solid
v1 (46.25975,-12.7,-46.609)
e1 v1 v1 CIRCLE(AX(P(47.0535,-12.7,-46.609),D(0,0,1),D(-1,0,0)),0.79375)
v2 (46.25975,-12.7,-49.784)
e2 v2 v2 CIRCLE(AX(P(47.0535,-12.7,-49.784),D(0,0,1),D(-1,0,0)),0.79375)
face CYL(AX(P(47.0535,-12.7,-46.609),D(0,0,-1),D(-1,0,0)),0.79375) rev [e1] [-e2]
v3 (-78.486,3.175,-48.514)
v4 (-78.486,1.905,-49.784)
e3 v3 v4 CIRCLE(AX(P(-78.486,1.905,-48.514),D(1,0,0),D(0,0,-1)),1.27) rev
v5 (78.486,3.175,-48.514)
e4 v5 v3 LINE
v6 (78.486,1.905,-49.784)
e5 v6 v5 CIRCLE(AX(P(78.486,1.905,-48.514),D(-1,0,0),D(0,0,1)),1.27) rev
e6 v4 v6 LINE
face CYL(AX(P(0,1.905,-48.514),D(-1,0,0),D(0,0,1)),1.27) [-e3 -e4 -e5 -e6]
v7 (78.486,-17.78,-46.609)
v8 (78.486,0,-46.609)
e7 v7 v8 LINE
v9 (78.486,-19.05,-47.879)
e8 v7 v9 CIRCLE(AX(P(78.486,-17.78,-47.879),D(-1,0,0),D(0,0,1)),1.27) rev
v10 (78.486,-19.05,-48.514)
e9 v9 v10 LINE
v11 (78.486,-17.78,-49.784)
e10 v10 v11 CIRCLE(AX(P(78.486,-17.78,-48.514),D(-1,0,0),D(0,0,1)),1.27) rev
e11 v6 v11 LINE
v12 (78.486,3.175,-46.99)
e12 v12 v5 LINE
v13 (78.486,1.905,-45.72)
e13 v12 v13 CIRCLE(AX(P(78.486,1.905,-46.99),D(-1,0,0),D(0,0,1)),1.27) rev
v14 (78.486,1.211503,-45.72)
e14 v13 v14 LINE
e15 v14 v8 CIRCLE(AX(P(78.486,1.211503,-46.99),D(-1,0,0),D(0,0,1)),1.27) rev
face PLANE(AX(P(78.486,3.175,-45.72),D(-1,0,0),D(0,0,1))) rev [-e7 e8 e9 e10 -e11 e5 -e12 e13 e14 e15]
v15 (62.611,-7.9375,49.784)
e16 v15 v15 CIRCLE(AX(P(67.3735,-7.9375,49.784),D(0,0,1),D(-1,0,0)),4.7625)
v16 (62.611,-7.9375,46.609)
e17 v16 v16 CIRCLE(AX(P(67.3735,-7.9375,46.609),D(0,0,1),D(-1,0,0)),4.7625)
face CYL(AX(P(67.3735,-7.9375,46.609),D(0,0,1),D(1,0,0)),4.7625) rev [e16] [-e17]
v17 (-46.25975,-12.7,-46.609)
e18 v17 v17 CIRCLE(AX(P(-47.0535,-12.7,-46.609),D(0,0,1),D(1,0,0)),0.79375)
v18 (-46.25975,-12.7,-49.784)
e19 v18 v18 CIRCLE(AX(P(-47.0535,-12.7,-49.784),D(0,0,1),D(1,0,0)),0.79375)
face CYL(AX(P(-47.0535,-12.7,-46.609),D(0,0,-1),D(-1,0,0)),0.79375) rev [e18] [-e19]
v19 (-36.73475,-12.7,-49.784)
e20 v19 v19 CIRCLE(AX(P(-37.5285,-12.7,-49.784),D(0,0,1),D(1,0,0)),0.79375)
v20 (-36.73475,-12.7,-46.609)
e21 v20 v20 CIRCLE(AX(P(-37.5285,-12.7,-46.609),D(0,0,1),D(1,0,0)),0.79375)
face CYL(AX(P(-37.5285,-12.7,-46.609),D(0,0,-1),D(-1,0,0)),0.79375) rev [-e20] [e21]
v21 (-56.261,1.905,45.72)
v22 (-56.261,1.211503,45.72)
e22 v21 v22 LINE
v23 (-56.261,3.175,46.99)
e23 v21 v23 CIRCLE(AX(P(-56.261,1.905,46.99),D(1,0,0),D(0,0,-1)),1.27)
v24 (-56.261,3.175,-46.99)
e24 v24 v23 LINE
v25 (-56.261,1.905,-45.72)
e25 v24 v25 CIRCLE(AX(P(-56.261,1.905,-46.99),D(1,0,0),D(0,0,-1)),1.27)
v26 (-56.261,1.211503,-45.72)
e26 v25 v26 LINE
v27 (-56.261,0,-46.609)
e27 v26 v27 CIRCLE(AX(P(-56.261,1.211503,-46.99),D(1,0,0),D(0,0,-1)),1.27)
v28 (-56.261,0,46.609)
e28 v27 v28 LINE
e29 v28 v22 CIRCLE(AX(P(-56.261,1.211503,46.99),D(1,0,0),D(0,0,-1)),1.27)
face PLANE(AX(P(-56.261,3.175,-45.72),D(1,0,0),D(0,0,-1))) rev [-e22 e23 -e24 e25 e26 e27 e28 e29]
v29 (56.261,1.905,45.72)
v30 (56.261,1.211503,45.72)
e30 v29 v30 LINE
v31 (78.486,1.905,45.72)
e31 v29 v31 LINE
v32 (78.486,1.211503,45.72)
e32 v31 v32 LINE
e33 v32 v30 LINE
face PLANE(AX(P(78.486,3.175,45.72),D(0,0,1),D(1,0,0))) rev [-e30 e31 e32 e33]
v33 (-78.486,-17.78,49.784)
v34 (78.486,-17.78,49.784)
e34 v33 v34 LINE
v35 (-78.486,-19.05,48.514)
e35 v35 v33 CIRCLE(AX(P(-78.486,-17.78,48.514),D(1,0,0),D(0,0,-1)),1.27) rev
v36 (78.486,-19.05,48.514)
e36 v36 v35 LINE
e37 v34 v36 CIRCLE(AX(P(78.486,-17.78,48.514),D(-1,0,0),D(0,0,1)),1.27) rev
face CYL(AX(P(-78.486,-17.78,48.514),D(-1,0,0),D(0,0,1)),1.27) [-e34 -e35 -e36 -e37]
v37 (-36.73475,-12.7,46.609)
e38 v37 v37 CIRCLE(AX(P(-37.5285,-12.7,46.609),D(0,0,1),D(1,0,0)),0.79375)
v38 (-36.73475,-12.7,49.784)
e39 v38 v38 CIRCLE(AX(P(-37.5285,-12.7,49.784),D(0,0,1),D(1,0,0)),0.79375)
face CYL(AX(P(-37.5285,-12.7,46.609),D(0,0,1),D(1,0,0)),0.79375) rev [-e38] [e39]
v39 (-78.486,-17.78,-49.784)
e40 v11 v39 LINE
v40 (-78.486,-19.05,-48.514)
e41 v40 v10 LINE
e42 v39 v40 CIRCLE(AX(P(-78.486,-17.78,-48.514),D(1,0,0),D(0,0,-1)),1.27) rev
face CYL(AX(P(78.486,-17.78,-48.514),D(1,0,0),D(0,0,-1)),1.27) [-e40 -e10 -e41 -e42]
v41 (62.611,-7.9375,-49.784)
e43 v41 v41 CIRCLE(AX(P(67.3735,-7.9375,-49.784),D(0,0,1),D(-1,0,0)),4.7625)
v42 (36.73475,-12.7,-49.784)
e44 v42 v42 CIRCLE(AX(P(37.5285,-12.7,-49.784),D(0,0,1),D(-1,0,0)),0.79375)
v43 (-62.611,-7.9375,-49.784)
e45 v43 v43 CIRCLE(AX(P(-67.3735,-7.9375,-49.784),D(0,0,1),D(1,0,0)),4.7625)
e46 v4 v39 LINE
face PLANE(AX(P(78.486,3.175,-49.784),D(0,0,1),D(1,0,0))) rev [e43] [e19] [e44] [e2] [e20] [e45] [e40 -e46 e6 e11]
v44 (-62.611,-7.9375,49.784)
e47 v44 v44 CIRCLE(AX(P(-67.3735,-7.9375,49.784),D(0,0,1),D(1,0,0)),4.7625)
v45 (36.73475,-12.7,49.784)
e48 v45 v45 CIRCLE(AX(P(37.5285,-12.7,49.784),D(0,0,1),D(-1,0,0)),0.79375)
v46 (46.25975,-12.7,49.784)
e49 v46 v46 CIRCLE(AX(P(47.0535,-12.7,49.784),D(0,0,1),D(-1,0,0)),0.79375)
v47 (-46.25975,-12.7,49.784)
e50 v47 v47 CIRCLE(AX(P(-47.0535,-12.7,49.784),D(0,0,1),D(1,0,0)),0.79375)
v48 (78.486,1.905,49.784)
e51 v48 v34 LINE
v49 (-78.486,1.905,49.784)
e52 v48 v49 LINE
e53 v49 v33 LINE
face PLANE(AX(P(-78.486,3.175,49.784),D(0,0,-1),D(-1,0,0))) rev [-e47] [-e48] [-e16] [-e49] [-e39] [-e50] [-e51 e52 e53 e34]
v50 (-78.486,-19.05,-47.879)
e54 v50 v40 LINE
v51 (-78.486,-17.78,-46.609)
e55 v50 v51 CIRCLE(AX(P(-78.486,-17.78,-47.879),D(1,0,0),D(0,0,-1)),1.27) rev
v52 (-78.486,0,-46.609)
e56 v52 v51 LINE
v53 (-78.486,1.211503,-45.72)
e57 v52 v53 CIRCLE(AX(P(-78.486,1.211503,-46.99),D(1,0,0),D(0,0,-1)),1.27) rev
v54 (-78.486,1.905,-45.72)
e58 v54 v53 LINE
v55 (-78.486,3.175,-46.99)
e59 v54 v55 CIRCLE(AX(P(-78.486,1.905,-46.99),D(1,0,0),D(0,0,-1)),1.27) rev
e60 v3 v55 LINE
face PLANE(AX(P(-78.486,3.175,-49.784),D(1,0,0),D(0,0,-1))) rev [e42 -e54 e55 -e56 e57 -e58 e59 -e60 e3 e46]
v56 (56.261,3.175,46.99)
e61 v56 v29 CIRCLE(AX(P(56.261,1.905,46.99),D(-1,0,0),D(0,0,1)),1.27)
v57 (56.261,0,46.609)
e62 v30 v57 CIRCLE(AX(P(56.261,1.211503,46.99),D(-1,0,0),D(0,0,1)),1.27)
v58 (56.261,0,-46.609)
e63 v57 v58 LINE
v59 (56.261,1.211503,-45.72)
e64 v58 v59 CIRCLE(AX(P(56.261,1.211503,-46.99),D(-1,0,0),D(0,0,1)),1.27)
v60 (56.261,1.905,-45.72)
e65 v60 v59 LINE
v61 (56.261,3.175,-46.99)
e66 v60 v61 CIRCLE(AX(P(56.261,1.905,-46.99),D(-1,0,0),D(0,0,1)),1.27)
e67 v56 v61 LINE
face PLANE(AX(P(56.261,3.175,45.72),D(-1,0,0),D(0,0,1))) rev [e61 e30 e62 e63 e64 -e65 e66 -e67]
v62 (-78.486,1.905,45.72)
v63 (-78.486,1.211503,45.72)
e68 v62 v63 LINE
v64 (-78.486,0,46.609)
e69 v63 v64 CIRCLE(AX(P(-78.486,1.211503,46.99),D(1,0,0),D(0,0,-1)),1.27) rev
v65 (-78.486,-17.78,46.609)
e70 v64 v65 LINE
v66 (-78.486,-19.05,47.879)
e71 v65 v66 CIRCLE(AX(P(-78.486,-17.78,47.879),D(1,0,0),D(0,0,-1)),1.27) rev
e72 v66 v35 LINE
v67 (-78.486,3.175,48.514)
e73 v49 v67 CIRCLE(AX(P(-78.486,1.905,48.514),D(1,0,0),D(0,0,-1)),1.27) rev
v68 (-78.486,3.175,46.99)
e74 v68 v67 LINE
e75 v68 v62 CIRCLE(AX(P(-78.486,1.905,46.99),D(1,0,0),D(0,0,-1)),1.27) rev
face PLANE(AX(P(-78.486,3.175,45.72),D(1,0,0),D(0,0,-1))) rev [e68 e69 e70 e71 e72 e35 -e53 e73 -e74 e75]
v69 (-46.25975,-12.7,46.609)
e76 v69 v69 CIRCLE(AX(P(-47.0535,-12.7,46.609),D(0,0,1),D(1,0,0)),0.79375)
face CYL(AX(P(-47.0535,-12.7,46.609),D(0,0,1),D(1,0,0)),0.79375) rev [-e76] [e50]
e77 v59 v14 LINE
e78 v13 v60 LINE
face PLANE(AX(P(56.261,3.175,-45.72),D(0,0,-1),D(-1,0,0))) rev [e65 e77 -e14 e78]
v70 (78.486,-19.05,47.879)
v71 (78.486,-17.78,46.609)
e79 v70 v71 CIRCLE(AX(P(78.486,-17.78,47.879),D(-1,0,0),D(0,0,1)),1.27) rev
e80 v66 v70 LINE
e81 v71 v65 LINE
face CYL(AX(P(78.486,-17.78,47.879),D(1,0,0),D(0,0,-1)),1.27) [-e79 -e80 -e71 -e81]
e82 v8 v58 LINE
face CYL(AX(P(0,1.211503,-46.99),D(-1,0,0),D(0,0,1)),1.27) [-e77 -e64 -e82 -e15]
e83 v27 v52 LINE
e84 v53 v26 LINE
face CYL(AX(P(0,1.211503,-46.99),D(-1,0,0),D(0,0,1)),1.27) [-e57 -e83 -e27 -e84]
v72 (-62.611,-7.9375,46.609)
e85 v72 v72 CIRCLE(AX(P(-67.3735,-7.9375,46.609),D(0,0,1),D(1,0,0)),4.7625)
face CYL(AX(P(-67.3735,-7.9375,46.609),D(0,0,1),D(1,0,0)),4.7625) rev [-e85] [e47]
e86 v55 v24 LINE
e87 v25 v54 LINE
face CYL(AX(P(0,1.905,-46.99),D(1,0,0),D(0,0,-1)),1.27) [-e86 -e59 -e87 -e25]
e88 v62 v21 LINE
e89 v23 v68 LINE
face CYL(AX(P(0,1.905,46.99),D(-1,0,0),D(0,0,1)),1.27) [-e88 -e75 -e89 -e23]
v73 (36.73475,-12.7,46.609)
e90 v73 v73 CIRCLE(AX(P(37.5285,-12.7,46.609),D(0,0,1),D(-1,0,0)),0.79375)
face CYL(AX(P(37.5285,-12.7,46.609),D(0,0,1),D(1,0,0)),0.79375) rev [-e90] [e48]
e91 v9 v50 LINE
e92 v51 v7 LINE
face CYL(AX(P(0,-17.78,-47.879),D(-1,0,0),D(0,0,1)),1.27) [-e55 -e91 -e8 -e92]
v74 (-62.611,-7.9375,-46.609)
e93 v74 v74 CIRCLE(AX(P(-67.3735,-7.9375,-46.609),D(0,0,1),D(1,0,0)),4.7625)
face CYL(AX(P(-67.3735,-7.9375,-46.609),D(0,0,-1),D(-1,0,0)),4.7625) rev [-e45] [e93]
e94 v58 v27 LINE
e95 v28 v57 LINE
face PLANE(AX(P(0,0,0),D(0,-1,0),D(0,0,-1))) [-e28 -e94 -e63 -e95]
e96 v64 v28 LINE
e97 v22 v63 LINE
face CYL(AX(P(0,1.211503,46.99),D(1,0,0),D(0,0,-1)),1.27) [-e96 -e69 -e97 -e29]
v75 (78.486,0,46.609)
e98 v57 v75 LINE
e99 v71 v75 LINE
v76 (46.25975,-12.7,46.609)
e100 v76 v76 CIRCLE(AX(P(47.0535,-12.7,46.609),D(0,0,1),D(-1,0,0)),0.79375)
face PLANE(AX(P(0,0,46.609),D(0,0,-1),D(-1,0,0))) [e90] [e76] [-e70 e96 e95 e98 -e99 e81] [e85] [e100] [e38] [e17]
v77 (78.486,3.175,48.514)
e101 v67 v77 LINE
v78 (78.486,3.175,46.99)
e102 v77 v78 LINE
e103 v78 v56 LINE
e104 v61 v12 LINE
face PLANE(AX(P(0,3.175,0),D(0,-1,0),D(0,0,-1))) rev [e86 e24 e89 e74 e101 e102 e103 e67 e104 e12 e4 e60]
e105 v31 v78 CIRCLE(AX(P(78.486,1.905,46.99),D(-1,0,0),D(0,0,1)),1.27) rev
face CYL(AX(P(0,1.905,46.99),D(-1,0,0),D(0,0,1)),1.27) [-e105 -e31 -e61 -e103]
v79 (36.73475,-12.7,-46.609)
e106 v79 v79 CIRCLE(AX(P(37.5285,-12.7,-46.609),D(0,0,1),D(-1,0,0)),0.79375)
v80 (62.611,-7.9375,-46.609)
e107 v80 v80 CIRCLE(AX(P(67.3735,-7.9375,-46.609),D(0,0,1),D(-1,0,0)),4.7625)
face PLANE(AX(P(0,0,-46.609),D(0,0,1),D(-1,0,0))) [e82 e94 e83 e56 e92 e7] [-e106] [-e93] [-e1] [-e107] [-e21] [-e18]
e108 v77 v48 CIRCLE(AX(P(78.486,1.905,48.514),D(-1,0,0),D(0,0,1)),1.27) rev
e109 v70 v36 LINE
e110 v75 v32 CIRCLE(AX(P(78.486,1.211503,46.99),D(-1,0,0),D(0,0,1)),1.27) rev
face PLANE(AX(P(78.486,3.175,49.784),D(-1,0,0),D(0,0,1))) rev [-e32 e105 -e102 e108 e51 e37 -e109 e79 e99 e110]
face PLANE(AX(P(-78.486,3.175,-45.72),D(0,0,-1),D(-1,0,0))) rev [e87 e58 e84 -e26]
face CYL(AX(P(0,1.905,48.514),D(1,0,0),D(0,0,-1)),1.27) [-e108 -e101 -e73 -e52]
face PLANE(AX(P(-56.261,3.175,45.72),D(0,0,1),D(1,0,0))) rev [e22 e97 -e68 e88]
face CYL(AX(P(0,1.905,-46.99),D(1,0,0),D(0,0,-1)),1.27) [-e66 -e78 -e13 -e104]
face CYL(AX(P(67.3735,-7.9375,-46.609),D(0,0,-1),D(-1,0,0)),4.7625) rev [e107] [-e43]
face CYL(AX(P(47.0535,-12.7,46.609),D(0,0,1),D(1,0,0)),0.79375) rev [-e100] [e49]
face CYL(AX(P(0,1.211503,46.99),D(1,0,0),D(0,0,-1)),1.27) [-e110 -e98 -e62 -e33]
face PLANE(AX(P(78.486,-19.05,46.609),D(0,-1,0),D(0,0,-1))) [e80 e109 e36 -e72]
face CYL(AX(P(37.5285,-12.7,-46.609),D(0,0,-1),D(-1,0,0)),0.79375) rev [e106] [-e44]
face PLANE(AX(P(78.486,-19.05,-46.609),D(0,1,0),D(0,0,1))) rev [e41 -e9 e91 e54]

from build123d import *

# Parameters (mm, degrees)
BOSS_EXTRUDE1_DEPTH = 3.175
SKETCH2_W           = 156.972
SKETCH2_H           = 22.225
SKETCH2_R           = 4.7625
SKETCH2_R_2         = 0.79375
BOSS_EXTRUDE2_DEPTH = 3.175
FILLET2_R           = 1.27


with BuildPart() as part:
    # Sketch1 → Boss-Extrude1 (new body)
    with BuildSketch(Plane(origin=(0, 0, 0), x_dir=(1, 0, 0), z_dir=(0, 1, 0))):
        Polygon((-78.486, 49.784), (-78.486, 45.72), (-56.261, 45.72), (-56.261, -45.72), (-78.486, -45.72), (-78.486, -49.784), (78.486, -49.784), (78.486, -45.72), (56.261, -45.72), (56.261, 45.72), (78.486, 45.72), (78.486, 49.784), align=None)
    extrude(amount=BOSS_EXTRUDE1_DEPTH)

    # Sketch2 → Boss-Extrude2 (add)
    with BuildSketch(Plane.XY.offset(49.784)):
        with Locations((0, -7.9375)):
            Rectangle(SKETCH2_W, SKETCH2_H)
        with Locations((-67.3735, -7.9375)):
            Circle(SKETCH2_R, mode=Mode.SUBTRACT)
        with Locations(Location((67.3735, -7.9375, 0), (0, 0, 180))):
            Circle(SKETCH2_R, mode=Mode.SUBTRACT)
        with Locations((-47.0535, -12.7)):
            Circle(SKETCH2_R_2, mode=Mode.SUBTRACT)
        with Locations((-37.5285, -12.7)):
            Circle(SKETCH2_R_2, mode=Mode.SUBTRACT)
        with Locations(Location((37.5285, -12.7, 0), (0, 0, 180))):
            Circle(SKETCH2_R_2, mode=Mode.SUBTRACT)
        with Locations(Location((47.0535, -12.7, 0), (0, 0, 180))):
            Circle(SKETCH2_R_2, mode=Mode.SUBTRACT)
    boss_extrude2 = extrude(amount=-BOSS_EXTRUDE2_DEPTH)

    # Mirror2: Boss-Extrude2 across plane
    add(boss_extrude2.mirror(Plane.XY))

    # Fillet2
    # the kernel refuses this fillet: 1.27 mm, written as the material it takes off along each edge
    with BuildSketch(Plane(origin=(-56.261, 0, 45.72), x_dir=(0, 1, 0), z_dir=(-1, 0, 0)), Plane(origin=(56.261, 0, -45.72), x_dir=(0, 1, 0), z_dir=(1, 0, 0)), Plane(origin=(81.514756964, 0, 45.72), x_dir=(0, 1, 0), z_dir=(-1, 0, 0))) as fillet2_piece_1:
        with BuildLine():
            CenterArc((1.211502786, -1.27), FILLET2_R, 90, 72.542396876)
            Line((0, -0.889), (-0.024230056, -0.88138))
            ThreePointArc((-0.024230056, -0.88138), (-0.0254, -0.4445), (-0.0254, 0))
            Line((-0.0254, 0), (0, 0.0254))
            Line((0, 0.0254), (1.211502786, 0.0254))
            Line((1.211502786, 0.0254), (1.211502786, 0))
        make_face()
    extrude(amount=25.253756964, mode=Mode.SUBTRACT)
    with BuildSketch(Plane(origin=(-81.514756964, 0, -45.72), x_dir=(0, 0, -1), z_dir=(1, 0, 0))) as fillet2_piece_2:
        with BuildLine():
            CenterArc((1.27, 1.211502786), FILLET2_R, 180, 72.542396876)
            Line((0, 1.211502786), (-0.0254, 1.211502786))
            Line((-0.0254, 1.211502786), (-0.0254, 0))
            Line((-0.0254, 0), (0, -0.0254))
            ThreePointArc((0, -0.0254), (0.4445, -0.0254), (0.88138, -0.024230056))
            Line((0.88138, -0.024230056), (0.889, 0))
        make_face()
    extrude(amount=25.253756964, mode=Mode.SUBTRACT)
    with BuildSketch(Plane(origin=(81.661, 3.175, 45.72), x_dir=(0, -1, 0), z_dir=(-1, 0, 0)), Plane(origin=(56.261, 3.175, -45.72), x_dir=(0, -1, 0), z_dir=(1, 0, 0)), Plane(origin=(-81.661, 3.175, -45.72), x_dir=(0, -1, 0), z_dir=(1, 0, 0)), Plane(origin=(-56.261, 3.175, 45.72), x_dir=(0, -1, 0), z_dir=(-1, 0, 0))) as fillet2_piece_3:
        with BuildLine():
            CenterArc((FILLET2_R, FILLET2_R), FILLET2_R, 180, 90)
            Line((0, FILLET2_R), (-FILLET2_R * 0.02, FILLET2_R))
            Line((-FILLET2_R * 0.02, FILLET2_R), (-FILLET2_R * 0.02, -FILLET2_R * 0.02))
            Line((-FILLET2_R * 0.02, -FILLET2_R * 0.02), (FILLET2_R, -FILLET2_R * 0.02))
            Line((FILLET2_R, -FILLET2_R * 0.02), (FILLET2_R, 0))
        make_face()
    extrude(amount=25.4, mode=Mode.SUBTRACT)
    with BuildSketch(Plane(origin=(-81.661, -19.05, -46.609), x_dir=(0, 0, -1), z_dir=(1, 0, 0)), Plane(origin=(-81.661, -19.05, -49.784), x_dir=(0, 1, 0), z_dir=(1, 0, 0)), Plane(origin=(-81.661, 3.175, 49.784), x_dir=(0, -1, 0), z_dir=(1, 0, 0)), Plane(origin=(81.661, 3.175, -49.784), x_dir=(0, -1, 0), z_dir=(-1, 0, 0))) as fillet2_piece_4:
        with BuildLine():
            CenterArc((FILLET2_R, FILLET2_R), FILLET2_R, 180, 90)
            Line((0, FILLET2_R), (-FILLET2_R * 0.02, FILLET2_R))
            Line((-FILLET2_R * 0.02, FILLET2_R), (-FILLET2_R * 0.02, -FILLET2_R * 0.02))
            Line((-FILLET2_R * 0.02, -FILLET2_R * 0.02), (FILLET2_R, -FILLET2_R * 0.02))
            Line((FILLET2_R, -FILLET2_R * 0.02), (FILLET2_R, 0))
        make_face()
    extrude(amount=163.322, mode=Mode.SUBTRACT)
    with BuildSketch(Plane(origin=(-81.661, -19.05, 46.609), x_dir=(0, 0, 1), z_dir=(1, 0, 0)), Plane(origin=(-81.661, -19.05, 49.784), x_dir=(0, 1, 0), z_dir=(1, 0, 0))) as fillet2_piece_5:
        with BuildLine():
            CenterArc((FILLET2_R, -FILLET2_R), FILLET2_R, 90, 90)
            Line((0, -FILLET2_R), (-FILLET2_R * 0.02, -FILLET2_R))
            Line((-FILLET2_R * 0.02, -FILLET2_R), (-FILLET2_R * 0.02, FILLET2_R * 0.02))
            Line((-FILLET2_R * 0.02, FILLET2_R * 0.02), (FILLET2_R, FILLET2_R * 0.02))
            Line((FILLET2_R, FILLET2_R * 0.02), (FILLET2_R, 0))
        make_face()
    extrude(amount=163.322, mode=Mode.SUBTRACT)


solid = part.part
